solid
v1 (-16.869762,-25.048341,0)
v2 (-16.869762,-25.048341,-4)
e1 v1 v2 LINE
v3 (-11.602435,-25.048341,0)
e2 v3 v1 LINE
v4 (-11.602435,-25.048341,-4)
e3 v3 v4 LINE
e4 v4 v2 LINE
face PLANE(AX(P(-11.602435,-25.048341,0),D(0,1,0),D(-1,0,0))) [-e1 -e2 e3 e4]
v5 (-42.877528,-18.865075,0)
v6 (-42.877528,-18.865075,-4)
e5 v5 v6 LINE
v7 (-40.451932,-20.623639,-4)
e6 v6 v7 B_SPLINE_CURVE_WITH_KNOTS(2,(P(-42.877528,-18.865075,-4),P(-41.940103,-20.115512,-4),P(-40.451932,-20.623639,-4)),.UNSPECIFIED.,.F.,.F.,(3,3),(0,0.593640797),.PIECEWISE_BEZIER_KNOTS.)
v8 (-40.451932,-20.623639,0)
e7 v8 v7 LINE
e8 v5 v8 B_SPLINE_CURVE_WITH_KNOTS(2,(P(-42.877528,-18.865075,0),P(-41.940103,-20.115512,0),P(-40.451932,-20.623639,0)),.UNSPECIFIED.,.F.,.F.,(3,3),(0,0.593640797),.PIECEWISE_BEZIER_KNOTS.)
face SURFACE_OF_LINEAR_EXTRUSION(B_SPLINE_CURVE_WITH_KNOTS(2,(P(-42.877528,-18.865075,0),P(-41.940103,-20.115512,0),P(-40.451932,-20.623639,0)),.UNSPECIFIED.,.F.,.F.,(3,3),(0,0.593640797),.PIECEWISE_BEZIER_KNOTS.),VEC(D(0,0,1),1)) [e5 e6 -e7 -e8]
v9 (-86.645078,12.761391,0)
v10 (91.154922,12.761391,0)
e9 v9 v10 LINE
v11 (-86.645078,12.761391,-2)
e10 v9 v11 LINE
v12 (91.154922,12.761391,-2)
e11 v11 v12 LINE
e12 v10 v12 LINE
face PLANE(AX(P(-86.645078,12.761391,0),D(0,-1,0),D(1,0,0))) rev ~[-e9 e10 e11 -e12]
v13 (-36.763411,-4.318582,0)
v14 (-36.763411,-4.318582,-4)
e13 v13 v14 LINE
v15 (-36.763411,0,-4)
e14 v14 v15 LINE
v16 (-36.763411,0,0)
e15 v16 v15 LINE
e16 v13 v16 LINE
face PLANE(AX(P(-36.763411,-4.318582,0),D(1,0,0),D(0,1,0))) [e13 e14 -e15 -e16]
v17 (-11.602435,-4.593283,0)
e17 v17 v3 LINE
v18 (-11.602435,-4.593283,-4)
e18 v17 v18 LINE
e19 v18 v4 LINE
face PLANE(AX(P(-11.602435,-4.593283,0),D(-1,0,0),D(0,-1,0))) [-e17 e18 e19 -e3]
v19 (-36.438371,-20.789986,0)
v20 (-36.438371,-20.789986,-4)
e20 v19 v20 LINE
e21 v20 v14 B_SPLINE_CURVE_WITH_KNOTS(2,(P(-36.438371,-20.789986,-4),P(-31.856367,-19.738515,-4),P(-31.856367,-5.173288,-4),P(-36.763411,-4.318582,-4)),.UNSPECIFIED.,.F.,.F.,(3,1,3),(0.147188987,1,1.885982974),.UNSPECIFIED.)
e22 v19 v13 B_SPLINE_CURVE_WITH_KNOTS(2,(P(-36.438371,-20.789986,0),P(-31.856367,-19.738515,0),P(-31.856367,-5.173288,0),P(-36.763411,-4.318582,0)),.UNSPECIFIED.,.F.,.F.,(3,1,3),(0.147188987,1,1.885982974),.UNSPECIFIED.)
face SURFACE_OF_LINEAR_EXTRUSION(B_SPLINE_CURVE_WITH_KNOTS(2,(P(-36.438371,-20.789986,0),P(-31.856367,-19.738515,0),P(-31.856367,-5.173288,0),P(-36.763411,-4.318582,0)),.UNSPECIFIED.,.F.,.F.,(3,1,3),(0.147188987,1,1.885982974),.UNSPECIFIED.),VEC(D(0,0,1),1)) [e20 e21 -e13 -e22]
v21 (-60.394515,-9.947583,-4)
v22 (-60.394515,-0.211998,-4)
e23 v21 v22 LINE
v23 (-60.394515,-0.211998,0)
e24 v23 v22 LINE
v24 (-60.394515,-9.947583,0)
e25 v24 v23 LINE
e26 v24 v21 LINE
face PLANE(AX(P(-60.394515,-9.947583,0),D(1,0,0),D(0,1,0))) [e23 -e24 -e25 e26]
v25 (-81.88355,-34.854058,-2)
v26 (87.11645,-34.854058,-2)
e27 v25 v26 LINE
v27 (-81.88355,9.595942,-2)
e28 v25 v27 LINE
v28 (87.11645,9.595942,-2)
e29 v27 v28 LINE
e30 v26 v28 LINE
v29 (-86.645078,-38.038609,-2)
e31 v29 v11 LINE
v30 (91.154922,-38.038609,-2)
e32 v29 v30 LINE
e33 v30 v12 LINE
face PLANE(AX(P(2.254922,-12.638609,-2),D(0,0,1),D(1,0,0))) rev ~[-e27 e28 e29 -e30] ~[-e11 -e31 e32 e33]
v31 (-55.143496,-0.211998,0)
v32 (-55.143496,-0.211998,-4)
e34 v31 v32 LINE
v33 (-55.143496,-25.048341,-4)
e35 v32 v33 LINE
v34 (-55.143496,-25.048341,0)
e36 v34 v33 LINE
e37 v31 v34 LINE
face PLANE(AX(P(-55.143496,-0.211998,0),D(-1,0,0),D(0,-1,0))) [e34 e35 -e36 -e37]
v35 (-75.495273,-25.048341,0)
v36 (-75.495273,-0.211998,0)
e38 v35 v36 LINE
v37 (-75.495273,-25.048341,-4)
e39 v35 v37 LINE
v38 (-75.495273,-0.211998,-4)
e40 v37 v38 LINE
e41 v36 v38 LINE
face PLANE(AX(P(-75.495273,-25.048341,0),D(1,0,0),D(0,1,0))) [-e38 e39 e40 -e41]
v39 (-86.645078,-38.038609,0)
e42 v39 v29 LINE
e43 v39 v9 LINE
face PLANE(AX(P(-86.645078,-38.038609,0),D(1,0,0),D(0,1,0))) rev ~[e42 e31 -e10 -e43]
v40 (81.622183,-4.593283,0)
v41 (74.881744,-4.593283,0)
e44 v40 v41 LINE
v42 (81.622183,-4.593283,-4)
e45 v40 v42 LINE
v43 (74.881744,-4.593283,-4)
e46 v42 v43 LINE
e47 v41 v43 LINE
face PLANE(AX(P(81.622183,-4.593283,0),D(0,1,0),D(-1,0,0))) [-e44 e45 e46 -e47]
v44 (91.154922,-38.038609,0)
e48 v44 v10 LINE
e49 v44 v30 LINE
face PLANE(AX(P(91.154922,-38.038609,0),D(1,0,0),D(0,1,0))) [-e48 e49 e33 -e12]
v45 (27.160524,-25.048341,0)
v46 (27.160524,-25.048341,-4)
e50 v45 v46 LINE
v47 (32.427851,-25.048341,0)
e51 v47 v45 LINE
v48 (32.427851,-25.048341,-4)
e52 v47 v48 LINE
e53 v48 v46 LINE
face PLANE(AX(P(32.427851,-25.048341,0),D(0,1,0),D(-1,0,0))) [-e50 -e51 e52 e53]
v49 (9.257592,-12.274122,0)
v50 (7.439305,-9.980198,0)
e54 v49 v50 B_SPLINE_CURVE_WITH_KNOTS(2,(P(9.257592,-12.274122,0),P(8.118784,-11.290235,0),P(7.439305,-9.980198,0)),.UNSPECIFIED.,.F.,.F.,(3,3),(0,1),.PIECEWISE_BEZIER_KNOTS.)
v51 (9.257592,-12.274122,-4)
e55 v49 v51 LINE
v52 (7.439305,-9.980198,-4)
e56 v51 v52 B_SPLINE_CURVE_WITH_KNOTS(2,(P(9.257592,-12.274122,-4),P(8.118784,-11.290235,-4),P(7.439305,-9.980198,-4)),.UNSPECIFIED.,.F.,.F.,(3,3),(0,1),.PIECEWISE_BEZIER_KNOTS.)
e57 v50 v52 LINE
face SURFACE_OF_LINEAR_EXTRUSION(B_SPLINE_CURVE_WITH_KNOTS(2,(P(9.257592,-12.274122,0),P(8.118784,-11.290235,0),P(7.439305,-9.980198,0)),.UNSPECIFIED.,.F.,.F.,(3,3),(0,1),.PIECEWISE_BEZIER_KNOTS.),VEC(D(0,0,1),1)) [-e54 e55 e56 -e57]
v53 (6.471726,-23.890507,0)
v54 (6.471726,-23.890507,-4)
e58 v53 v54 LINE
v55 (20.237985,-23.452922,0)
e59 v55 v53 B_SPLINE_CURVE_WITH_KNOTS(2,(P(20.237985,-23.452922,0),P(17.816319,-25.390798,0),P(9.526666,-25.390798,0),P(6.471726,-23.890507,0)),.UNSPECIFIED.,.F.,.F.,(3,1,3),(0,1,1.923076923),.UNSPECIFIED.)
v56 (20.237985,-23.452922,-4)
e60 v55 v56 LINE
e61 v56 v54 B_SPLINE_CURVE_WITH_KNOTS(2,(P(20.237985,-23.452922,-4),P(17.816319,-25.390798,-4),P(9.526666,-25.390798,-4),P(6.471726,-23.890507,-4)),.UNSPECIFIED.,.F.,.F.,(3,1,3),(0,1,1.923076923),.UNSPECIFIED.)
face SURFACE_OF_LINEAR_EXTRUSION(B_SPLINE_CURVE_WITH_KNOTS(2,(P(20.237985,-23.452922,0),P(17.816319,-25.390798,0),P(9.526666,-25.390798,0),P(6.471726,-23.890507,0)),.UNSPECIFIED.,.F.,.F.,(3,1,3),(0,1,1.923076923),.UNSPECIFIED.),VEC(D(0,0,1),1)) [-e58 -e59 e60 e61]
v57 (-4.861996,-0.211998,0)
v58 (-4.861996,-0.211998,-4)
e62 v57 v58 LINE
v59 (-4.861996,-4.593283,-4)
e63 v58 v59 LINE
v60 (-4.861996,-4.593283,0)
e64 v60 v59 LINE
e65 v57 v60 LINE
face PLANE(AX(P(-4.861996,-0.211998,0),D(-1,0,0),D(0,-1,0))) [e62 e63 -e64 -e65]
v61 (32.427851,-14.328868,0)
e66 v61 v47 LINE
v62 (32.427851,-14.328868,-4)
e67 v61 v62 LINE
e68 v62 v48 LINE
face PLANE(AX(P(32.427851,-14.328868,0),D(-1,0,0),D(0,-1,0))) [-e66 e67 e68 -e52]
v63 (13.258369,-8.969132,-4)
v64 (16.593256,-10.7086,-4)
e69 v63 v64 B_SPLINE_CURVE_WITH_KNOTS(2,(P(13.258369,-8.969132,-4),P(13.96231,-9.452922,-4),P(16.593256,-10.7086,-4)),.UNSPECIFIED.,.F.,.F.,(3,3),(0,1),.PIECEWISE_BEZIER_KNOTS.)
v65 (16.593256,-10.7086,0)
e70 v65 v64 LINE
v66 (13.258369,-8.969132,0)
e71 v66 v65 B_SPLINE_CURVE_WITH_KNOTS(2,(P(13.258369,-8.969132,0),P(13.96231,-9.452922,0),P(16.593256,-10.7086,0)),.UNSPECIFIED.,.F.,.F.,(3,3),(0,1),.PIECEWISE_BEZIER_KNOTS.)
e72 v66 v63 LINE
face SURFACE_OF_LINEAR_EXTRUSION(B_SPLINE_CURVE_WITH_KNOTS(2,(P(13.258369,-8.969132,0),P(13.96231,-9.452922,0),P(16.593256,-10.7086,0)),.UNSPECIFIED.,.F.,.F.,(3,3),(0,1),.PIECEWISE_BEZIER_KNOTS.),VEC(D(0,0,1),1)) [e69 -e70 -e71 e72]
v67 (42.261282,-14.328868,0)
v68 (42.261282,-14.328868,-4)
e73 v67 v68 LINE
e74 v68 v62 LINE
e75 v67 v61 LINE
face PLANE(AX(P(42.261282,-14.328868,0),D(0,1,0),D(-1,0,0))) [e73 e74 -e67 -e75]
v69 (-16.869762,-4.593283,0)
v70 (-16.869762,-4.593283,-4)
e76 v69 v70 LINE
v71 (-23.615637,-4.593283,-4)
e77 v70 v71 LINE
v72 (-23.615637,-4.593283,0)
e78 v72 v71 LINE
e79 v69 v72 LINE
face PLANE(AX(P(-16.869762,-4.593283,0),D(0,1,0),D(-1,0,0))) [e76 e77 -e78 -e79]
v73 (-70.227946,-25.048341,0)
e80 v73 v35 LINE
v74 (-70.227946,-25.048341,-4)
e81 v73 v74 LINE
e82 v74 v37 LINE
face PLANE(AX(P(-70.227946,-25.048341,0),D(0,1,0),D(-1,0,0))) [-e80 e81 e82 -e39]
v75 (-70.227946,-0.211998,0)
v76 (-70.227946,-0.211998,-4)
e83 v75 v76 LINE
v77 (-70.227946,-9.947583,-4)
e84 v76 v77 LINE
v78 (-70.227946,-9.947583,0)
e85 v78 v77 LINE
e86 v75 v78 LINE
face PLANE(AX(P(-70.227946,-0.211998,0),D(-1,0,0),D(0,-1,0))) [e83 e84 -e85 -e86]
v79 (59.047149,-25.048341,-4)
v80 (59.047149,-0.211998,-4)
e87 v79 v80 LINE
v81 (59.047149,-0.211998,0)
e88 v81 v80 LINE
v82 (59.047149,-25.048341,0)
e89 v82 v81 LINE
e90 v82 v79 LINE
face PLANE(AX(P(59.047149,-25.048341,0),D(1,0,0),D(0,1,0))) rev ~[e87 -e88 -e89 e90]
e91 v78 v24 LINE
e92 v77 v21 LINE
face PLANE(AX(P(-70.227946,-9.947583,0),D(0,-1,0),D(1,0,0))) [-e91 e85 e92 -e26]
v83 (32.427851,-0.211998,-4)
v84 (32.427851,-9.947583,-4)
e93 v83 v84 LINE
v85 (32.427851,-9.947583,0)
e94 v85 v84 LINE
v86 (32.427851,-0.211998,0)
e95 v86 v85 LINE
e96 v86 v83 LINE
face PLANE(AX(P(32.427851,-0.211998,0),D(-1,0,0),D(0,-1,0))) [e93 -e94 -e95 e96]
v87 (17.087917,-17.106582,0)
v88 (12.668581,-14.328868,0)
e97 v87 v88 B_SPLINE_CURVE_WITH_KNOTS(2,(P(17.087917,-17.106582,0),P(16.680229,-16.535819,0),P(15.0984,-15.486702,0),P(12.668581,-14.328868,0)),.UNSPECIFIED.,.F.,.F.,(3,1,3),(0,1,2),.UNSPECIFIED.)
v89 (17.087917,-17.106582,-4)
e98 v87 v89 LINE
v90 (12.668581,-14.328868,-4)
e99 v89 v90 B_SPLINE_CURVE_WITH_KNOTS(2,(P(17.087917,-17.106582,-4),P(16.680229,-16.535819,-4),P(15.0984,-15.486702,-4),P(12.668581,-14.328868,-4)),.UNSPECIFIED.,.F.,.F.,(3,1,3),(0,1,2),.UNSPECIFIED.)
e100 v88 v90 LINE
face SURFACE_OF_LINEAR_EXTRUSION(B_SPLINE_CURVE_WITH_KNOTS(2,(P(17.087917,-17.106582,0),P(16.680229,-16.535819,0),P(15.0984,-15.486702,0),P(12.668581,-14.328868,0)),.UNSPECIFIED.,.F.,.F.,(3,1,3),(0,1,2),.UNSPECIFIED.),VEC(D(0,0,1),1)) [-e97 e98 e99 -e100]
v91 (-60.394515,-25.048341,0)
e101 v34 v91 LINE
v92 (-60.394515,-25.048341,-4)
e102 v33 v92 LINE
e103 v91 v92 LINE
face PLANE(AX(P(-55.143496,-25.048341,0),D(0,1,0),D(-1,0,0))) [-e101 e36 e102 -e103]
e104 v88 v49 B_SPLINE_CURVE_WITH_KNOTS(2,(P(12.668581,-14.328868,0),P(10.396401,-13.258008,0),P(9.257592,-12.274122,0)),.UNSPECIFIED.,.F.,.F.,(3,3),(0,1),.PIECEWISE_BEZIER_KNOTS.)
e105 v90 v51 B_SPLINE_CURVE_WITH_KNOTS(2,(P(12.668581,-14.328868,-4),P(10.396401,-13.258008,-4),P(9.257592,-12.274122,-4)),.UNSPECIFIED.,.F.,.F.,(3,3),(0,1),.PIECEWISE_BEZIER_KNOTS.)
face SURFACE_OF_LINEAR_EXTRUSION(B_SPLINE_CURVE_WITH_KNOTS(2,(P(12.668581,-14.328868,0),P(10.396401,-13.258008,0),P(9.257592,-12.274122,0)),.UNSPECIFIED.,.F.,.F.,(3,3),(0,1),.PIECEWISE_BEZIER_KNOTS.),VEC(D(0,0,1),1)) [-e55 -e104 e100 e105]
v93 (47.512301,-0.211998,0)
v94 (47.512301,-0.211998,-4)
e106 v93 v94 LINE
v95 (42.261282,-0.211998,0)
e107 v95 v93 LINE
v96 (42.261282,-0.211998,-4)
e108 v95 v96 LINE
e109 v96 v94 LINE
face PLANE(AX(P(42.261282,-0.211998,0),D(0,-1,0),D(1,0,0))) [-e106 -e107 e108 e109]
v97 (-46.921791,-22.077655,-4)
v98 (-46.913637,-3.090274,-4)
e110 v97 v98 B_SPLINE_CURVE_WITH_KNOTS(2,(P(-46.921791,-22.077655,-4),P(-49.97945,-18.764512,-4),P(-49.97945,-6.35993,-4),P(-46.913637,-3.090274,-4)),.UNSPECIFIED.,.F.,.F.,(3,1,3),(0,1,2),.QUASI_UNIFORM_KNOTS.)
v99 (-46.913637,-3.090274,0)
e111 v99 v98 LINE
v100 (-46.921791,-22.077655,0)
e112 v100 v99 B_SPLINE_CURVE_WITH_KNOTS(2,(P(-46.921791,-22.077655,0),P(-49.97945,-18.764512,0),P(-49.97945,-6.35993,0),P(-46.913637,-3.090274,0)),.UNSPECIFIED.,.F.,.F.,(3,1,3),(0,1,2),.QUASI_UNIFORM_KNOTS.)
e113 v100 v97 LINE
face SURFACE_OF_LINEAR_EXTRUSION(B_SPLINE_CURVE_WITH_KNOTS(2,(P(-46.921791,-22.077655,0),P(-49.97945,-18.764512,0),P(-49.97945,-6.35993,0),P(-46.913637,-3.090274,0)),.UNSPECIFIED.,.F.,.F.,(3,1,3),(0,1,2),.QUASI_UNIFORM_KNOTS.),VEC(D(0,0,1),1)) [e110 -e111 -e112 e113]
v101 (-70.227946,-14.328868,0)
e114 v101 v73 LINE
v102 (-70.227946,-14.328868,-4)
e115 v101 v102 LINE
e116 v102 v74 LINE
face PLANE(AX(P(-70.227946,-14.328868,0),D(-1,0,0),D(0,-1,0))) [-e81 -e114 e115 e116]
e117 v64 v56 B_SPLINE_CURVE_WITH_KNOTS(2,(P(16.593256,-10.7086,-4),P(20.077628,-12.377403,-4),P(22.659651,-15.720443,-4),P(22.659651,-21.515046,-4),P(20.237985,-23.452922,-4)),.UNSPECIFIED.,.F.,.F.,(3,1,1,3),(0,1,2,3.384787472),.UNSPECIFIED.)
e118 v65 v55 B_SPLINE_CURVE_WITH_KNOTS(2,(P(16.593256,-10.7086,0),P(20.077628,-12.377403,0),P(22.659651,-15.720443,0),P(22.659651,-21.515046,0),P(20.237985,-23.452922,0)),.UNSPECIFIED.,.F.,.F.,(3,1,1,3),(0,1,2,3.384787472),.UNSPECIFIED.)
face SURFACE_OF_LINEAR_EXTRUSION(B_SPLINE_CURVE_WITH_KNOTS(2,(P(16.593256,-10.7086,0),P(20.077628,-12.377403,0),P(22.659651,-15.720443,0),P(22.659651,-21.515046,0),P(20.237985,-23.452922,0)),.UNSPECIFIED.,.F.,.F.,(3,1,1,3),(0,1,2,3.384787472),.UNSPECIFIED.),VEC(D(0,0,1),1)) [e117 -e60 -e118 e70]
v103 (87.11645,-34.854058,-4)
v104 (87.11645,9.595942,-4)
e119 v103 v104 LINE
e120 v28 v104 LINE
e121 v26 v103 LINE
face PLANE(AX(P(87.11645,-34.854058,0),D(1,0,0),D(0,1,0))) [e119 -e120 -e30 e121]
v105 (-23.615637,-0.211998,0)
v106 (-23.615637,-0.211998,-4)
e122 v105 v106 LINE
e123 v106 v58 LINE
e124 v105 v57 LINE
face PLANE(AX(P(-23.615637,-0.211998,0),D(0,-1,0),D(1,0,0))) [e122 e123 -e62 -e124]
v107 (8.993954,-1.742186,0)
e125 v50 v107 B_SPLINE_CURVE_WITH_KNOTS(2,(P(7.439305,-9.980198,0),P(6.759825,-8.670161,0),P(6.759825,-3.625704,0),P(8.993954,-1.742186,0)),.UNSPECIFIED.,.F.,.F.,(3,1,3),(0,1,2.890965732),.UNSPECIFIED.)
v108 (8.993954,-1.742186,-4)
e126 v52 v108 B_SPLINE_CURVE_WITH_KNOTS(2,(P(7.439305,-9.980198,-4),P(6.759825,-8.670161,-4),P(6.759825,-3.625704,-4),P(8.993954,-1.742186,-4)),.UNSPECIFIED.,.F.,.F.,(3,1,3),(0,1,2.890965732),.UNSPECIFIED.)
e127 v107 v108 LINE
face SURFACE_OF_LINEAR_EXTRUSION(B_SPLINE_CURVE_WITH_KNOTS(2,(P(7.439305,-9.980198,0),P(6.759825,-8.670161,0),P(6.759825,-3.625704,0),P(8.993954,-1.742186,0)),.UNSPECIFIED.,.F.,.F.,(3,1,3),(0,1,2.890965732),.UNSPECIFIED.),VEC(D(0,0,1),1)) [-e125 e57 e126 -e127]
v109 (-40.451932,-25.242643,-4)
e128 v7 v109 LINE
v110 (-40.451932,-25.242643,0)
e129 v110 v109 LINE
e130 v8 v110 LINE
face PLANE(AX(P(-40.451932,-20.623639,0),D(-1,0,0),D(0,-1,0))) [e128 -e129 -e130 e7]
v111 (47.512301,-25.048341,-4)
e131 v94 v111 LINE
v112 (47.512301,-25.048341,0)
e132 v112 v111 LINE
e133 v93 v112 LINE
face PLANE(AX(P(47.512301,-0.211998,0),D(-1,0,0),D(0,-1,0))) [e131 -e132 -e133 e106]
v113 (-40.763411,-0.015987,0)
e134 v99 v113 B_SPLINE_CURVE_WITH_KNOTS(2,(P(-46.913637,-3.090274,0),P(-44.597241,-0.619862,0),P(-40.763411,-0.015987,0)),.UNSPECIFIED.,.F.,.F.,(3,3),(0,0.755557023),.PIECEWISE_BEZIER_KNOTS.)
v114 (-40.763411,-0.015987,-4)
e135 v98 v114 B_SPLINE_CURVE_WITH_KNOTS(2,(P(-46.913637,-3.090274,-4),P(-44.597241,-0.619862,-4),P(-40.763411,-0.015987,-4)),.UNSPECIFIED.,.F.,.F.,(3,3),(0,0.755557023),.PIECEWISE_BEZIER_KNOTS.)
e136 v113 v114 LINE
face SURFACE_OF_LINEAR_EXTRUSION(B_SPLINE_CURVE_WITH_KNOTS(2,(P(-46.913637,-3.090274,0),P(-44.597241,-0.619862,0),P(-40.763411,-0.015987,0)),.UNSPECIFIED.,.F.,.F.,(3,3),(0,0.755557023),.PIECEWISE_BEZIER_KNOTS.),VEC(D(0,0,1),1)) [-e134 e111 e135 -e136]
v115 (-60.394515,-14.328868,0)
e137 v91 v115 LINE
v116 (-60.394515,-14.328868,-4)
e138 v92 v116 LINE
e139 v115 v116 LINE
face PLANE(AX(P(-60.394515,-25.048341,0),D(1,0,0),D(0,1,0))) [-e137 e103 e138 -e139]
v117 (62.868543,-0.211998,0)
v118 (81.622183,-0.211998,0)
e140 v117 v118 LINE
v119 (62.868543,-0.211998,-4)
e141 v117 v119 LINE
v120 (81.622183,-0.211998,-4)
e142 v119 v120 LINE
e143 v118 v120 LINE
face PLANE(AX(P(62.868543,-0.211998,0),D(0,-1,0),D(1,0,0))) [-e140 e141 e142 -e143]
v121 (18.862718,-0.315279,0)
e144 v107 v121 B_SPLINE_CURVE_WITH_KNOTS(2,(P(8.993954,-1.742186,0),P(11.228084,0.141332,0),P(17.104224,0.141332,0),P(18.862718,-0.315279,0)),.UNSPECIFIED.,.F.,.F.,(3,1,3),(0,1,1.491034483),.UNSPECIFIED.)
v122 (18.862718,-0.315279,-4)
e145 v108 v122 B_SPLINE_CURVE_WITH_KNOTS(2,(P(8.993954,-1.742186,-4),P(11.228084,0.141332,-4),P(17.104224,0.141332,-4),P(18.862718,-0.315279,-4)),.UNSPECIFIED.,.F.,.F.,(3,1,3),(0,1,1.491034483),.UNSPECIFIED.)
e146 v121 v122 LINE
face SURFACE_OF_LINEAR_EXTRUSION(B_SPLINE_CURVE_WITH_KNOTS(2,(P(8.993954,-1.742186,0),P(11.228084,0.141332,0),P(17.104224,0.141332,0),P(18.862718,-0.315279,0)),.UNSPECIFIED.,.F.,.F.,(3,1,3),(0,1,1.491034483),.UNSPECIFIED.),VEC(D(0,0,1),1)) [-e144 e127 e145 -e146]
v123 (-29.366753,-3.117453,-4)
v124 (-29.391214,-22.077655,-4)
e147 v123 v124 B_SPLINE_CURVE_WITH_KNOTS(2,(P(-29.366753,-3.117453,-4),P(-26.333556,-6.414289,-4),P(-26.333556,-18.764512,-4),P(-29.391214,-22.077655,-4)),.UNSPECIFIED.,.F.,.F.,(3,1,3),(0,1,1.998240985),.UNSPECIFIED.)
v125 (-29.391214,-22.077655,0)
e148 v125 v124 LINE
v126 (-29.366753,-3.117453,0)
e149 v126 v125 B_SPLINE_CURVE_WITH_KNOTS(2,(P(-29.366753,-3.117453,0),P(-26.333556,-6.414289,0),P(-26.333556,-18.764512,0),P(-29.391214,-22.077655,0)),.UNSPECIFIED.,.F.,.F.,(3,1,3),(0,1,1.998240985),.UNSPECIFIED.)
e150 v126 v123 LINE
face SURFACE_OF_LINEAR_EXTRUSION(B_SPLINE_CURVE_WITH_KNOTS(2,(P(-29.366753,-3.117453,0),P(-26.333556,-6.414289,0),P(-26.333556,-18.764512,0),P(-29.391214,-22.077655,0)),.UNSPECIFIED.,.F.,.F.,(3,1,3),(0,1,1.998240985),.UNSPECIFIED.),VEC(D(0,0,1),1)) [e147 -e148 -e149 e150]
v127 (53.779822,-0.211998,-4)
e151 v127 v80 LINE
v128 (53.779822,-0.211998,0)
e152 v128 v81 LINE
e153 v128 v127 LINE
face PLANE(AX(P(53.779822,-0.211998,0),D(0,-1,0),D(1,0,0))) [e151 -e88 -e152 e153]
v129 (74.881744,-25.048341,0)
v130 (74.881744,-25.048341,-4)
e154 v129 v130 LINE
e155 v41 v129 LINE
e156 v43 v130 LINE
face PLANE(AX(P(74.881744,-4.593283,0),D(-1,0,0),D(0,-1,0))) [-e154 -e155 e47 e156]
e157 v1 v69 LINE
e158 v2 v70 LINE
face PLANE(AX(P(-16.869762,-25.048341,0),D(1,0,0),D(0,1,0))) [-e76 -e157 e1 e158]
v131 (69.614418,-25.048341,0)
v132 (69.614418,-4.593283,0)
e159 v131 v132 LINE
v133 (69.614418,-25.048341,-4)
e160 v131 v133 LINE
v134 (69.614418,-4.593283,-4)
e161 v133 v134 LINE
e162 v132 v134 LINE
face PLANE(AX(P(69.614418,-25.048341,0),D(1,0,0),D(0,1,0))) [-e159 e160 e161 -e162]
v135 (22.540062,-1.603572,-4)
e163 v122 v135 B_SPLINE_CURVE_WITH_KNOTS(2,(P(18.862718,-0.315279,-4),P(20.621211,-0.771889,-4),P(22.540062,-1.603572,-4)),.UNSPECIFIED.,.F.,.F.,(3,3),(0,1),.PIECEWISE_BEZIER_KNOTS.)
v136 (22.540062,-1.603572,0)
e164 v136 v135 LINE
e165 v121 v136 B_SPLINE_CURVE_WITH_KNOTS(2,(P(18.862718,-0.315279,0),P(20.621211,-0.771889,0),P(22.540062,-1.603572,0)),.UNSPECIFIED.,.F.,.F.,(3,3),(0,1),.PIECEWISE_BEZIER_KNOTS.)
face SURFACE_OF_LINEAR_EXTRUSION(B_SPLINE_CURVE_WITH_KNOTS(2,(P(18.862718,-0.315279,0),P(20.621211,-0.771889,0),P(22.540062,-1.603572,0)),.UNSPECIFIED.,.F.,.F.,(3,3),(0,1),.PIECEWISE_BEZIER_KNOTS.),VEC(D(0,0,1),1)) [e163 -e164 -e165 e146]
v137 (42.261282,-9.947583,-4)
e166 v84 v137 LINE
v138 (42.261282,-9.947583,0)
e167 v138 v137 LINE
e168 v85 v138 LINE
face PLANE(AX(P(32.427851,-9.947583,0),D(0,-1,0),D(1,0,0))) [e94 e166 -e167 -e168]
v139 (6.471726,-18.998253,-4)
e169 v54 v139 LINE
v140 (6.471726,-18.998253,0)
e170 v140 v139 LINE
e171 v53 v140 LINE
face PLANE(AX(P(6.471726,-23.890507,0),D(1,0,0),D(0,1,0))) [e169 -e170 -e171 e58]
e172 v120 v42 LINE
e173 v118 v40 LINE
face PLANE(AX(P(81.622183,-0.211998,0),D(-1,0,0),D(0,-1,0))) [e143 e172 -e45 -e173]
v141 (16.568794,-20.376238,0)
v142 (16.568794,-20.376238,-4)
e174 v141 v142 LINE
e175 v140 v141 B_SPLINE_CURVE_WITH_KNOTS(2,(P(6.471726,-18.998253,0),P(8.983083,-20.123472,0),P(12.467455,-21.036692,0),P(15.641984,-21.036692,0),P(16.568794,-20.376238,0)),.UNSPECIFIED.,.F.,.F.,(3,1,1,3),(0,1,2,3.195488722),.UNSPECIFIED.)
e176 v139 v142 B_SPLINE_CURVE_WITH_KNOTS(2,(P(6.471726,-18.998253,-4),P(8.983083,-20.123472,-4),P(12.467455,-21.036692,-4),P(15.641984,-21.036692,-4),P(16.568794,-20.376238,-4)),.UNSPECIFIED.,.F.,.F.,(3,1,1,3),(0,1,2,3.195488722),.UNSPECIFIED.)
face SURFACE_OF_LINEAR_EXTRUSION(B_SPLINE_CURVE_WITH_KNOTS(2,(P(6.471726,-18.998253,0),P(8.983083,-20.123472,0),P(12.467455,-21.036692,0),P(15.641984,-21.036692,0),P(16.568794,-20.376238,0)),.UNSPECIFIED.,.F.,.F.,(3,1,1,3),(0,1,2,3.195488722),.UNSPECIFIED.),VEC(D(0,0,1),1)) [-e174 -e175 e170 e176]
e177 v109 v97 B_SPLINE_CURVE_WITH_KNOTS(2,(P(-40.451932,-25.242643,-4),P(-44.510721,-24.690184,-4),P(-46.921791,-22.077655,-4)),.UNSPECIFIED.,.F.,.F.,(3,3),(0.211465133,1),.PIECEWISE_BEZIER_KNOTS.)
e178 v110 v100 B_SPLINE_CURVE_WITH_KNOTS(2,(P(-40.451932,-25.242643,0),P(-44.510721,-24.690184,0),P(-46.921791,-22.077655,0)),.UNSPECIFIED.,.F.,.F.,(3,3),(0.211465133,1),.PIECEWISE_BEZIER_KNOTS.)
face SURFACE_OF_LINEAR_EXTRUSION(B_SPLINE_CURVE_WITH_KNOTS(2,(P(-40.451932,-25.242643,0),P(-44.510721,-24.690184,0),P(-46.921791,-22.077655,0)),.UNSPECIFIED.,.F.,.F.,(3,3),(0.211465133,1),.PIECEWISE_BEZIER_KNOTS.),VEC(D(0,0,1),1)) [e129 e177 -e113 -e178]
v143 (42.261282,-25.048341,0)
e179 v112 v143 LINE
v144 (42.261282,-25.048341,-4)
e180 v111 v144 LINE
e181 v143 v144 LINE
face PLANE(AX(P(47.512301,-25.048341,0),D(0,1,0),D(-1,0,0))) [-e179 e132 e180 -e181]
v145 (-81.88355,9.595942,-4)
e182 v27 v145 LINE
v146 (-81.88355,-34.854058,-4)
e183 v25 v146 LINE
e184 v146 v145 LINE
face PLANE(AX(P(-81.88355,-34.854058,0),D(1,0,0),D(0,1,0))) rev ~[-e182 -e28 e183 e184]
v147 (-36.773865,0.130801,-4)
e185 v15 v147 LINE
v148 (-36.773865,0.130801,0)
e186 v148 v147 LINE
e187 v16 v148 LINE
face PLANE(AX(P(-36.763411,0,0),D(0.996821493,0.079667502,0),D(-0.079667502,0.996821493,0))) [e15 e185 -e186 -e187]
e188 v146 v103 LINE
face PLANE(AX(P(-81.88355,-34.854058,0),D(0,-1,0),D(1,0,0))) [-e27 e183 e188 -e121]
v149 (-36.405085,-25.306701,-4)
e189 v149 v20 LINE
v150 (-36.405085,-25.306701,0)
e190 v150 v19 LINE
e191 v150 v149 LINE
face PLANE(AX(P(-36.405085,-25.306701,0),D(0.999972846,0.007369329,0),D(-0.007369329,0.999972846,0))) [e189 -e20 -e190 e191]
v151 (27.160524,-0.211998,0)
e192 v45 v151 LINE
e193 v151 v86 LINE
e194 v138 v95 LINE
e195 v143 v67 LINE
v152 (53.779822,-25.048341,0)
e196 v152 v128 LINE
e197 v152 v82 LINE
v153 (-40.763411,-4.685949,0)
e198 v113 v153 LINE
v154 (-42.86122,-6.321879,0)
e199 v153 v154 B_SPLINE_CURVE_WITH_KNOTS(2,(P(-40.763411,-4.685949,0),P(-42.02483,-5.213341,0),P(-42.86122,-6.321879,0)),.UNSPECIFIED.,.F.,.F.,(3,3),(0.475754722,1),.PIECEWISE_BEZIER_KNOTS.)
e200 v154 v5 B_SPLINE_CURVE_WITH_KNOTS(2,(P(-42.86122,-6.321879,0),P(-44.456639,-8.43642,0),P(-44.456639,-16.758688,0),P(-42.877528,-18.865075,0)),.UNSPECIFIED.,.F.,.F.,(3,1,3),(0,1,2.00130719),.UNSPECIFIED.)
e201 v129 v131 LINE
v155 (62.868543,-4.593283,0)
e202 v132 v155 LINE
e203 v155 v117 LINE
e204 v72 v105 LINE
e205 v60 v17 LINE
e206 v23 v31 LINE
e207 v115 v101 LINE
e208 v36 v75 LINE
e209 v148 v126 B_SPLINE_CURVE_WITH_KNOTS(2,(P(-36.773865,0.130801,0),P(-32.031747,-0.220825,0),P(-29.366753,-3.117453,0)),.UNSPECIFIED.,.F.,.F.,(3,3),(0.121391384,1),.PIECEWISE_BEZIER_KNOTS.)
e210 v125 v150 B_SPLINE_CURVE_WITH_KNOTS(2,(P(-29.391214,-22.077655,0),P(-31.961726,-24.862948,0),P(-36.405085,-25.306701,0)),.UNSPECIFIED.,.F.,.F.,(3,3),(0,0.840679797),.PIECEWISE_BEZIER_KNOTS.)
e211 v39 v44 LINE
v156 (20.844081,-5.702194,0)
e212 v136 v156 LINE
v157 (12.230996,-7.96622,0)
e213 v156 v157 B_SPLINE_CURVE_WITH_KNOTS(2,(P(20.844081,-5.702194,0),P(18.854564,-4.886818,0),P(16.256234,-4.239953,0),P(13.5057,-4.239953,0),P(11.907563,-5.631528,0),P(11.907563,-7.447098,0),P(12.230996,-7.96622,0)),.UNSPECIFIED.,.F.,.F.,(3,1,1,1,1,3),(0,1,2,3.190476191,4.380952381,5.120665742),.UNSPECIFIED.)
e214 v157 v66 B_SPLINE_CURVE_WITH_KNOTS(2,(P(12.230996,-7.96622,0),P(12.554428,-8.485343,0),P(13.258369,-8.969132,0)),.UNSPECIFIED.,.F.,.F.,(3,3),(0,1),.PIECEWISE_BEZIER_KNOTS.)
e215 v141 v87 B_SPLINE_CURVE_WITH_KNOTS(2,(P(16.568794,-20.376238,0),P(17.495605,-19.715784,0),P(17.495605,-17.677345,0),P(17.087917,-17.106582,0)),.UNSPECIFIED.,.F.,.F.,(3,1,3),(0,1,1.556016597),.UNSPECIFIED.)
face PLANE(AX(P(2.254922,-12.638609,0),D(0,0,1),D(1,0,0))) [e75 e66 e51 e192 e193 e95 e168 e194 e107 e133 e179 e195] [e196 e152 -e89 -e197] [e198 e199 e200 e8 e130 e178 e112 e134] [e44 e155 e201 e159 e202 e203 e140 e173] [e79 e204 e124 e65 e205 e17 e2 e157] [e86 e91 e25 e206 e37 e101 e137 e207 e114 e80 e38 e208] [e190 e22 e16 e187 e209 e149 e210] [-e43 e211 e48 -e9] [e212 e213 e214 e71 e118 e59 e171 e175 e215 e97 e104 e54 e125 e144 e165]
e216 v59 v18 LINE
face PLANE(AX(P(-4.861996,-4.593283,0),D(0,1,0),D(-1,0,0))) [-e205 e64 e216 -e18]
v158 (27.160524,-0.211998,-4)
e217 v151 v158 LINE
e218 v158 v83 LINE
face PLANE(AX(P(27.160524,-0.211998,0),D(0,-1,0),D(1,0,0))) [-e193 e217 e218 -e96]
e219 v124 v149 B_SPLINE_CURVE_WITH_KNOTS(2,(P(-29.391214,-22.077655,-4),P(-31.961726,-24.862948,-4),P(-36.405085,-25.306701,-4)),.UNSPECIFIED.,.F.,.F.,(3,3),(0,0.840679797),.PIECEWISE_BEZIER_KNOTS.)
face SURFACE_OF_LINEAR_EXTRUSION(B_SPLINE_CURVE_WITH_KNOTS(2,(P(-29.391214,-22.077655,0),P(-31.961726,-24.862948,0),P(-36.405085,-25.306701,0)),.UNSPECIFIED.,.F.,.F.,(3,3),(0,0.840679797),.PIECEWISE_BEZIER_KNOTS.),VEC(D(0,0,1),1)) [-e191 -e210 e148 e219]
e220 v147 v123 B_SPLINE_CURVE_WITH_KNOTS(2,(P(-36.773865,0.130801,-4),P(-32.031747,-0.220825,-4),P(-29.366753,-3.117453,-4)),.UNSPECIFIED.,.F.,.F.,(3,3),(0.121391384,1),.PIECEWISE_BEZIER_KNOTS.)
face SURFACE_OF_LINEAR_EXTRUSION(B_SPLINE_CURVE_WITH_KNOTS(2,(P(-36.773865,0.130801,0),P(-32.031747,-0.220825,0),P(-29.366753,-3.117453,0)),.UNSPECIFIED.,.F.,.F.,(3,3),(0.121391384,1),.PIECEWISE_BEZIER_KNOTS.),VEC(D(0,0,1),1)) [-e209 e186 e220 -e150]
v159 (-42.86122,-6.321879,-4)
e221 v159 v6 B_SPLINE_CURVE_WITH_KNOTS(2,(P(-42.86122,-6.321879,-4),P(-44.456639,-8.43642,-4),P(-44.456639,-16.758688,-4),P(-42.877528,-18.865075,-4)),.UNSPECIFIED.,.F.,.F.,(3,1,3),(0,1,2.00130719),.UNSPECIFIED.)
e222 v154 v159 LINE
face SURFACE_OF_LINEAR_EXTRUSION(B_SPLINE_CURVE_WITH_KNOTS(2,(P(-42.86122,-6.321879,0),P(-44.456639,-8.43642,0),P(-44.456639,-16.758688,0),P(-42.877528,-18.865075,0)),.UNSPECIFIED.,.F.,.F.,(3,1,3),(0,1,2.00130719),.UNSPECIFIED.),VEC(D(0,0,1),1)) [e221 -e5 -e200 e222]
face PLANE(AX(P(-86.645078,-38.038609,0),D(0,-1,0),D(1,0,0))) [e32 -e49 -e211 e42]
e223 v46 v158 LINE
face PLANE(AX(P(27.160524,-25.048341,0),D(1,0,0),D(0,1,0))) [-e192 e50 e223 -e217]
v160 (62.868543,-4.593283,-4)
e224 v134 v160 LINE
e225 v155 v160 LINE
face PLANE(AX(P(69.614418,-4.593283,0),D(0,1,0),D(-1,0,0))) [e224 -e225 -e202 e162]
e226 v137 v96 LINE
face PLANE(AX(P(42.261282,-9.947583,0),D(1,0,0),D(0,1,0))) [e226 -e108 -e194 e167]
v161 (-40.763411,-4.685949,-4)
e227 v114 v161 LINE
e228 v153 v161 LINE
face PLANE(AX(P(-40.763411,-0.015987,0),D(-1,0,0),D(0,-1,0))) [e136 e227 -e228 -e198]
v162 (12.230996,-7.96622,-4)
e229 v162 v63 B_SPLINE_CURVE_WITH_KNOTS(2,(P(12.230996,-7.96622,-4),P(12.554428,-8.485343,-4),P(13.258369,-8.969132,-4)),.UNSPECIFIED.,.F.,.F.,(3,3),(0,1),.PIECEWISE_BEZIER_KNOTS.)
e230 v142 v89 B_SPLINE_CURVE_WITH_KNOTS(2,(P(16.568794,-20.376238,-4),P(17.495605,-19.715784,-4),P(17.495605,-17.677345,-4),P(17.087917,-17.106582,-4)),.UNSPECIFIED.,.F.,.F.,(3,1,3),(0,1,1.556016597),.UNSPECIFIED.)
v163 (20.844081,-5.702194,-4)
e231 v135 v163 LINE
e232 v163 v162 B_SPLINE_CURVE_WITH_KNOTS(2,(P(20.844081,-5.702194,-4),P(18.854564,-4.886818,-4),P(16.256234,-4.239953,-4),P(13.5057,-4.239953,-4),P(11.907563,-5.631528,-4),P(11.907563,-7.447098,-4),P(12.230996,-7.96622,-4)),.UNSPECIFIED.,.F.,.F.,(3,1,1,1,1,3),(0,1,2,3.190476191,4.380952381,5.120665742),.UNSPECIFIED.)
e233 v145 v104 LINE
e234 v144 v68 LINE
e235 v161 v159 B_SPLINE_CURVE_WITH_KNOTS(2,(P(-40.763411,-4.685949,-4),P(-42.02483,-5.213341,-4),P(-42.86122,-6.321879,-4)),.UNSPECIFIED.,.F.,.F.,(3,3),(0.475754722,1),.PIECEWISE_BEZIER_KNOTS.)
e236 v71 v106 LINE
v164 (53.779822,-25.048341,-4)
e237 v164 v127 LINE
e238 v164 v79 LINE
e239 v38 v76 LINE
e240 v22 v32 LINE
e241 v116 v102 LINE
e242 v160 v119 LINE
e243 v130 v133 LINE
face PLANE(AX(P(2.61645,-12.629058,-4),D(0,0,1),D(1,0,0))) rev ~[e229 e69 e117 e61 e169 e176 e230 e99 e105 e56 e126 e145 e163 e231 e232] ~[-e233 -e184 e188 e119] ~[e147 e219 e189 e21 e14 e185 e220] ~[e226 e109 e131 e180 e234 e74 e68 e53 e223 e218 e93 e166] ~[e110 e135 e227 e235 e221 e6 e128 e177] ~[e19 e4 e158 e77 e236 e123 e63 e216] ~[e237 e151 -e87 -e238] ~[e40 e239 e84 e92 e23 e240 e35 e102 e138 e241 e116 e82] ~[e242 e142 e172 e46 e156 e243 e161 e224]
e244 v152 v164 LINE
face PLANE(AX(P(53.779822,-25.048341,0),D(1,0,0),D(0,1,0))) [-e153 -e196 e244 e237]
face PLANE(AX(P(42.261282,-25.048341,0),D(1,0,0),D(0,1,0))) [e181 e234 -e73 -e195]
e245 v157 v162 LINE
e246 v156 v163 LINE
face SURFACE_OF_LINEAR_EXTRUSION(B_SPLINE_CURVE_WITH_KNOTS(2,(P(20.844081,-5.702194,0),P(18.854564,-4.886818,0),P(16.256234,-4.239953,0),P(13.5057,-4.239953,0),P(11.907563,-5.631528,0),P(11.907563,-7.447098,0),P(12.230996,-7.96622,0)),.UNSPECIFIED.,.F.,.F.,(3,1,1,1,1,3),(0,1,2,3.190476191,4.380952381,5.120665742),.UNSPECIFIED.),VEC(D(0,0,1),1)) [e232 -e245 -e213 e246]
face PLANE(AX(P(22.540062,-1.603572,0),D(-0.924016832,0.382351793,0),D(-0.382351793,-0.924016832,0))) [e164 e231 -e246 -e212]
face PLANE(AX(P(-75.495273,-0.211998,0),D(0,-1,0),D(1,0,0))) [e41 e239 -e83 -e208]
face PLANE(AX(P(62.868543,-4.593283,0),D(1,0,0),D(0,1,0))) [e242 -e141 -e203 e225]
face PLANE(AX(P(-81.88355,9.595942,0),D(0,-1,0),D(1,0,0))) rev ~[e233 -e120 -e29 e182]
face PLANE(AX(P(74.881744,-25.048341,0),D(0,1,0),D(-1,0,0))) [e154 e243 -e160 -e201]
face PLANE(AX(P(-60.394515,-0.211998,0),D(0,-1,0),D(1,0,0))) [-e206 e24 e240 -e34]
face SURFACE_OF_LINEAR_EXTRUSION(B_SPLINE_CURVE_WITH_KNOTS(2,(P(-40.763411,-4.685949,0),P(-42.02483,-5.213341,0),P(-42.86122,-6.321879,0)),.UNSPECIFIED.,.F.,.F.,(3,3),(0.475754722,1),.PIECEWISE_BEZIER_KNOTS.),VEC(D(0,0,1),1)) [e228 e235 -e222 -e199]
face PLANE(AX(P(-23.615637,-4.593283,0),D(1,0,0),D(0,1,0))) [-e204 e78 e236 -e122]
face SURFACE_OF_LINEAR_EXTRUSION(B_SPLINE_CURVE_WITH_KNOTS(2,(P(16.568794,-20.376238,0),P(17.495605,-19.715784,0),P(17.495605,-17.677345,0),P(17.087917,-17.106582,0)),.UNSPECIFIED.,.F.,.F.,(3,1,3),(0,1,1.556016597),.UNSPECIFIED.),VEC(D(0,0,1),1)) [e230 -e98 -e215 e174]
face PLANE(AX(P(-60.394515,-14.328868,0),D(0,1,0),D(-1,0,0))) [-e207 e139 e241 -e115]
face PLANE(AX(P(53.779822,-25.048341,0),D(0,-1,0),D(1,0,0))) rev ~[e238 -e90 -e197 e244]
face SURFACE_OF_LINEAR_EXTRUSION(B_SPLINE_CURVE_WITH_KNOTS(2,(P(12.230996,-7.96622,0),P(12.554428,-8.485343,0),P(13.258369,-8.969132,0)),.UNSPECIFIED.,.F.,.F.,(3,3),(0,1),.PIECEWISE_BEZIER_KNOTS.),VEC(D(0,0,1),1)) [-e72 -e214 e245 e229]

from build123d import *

# Parameters (mm, degrees)
F0_W     = 169
F0_H     = 44.45
F0_W_2   = 5.2673268342
F0_H_2   = 24.8363429365
F1_DEPTH = 4
F0_W_3   = 177.8
F0_H_3   = 50.8
F2_DEPTH = 2


with BuildPart() as f1:
    # F0 (on Top) → F1 (new body)
    with BuildSketch(Plane.XY):
        with Locations((2.6164503098, -12.6290581763)):
            Rectangle(F0_W, F0_H)
        Polygon((-55.1434959277, -0.2119976744), (-55.1434959277, -25.0483406109), (-60.3945152484, -25.0483406109), (-60.3945152484, -14.3288684571), (-70.2279458398, -14.3288684571), (-70.2279458398, -25.0483406109), (-75.495272674, -25.0483406109), (-75.495272674, -0.2119976744), (-70.2279458398, -0.2119976744), (-70.2279458398, -9.9475831853), (-60.3945152484, -9.9475831853), (-60.3945152484, -0.2119976744), align=None, mode=Mode.SUBTRACT)
        with BuildLine():
            Line((-40.7634110153, -0.0159870709), (-40.7634110153, 0))
            Line((-40.7634110153, 0), (-40.7634110153, 1.3887999812))
            Line((-40.7634110153, 1.3887999812), (-36.8744060397, 1.3887999812))
            Line((-36.8744060397, 1.3887999812), (-36.7738648248, 0.1308009128))
            add(Edge.make_bspline(
                [(-36.7738648248, 0.1308009128), (-32.0317465053, -0.2208247915), (-29.3667530507, -3.1174529818)],
                knots=[0.1213913838, 0.1213913838, 0.1213913838, 1, 1, 1], degree=2))
            add(Edge.make_bspline(
                [(-29.3667530507, -3.1174529818), (-26.3335555549, -6.4142886113), (-26.3335555549, -12.5948361969)],
                knots=[0, 0, 0, 1, 1, 1], degree=2))
            add(Edge.make_bspline(
                [(-26.3335555549, -12.5948361969), (-26.3335555549, -18.764512107), (-29.3912143208, -22.0776552498)],
                knots=[0, 0, 0, 1, 1, 1], degree=2))
            add(Edge.make_bspline(
                [(-29.3912143208, -22.0776552498), (-31.96172627, -24.8629477529), (-36.405085353, -25.3067011213)],
                knots=[0, 0, 0, 0.8406797965, 0.8406797965, 0.8406797965], degree=2))
            Line((-36.405085353, -25.3067011213), (-36.4003777504, -25.9454939514))
            Line((-36.4003777504, -25.9454939514), (-40.4519320428, -25.9454939514))
            Line((-40.4519320428, -25.9454939514), (-40.4519320428, -25.2426429066))
            add(Edge.make_bspline(
                [(-40.4519320428, -25.2426429066), (-44.5107206961, -24.6901841388), (-46.9217912458, -22.0776552498)],
                knots=[0.2114651326, 0.2114651326, 0.2114651326, 1, 1, 1], degree=2))
            add(Edge.make_bspline(
                [(-46.9217912458, -22.0776552498), (-49.9794500118, -18.764512107), (-49.9794500118, -12.5622211701)],
                knots=[0, 0, 0, 1, 1, 1], degree=2))
            add(Edge.make_bspline(
                [(-49.9794500118, -12.5622211701), (-49.9794500118, -6.3599302332), (-46.9136374891, -3.0902737928)],
                knots=[0, 0, 0, 1, 1, 1], degree=2))
            add(Edge.make_bspline(
                [(-46.9136374891, -3.0902737928), (-44.5972413071, -0.6198619073), (-40.7634110153, -0.0159870709)],
                knots=[0, 0, 0, 0.7555570228, 0.7555570228, 0.7555570228], degree=2))
        make_face(mode=Mode.SUBTRACT)
        Polygon((-11.6024351001, -4.5932829462), (-11.6024351001, -25.0483406109), (-16.8697619343, -25.0483406109), (-16.8697619343, -4.5932829462), (-23.6156366518, -4.5932829462), (-23.6156366518, -0.2119976744), (-4.8619962204, -0.2119976744), (-4.8619962204, -4.5932829462), align=None, mode=Mode.SUBTRACT)
        with BuildLine():
            add(Edge.make_bspline(
                [(21.3686391133, -14.0489228101), (22.6596505923, -15.7204429355), (22.6596505923, -18.1502624349)],
                knots=[0, 0, 0, 1, 1, 1], degree=2))
            add(Edge.make_bspline(
                [(22.6596505923, -18.1502624349), (22.6596505923, -21.5150460369), (20.2379848496, -23.4529222148)],
                knots=[0, 0, 0, 1, 1, 1], degree=2))
            add(Edge.make_bspline(
                [(20.2379848496, -23.4529222148), (17.816319107, -25.3907983927), (13.5056997267, -25.3907983927)],
                knots=[0, 0, 0, 1, 1, 1], degree=2))
            add(Edge.make_bspline(
                [(13.5056997267, -25.3907983927), (9.5266664525, -25.3907983927), (6.4717256055, -23.8905071582)],
                knots=[0, 0, 0, 1, 1, 1], degree=2))
            Line((6.4717256055, -23.8905071582), (6.4717256055, -18.9982531326))
            add(Edge.make_bspline(
                [(6.4717256055, -18.9982531326), (8.9830826719, -20.1234715585), (10.7252686888, -20.5800819342)],
                knots=[0, 0, 0, 1, 1, 1], degree=2))
            add(Edge.make_bspline(
                [(10.7252686888, -20.5800819342), (12.4674547057, -21.0366923099), (13.9133875621, -21.0366923099)],
                knots=[0, 0, 0, 1, 1, 1], degree=2))
            add(Edge.make_bspline(
                [(13.9133875621, -21.0366923099), (15.6419839845, -21.0366923099), (16.5687943305, -20.3762380165)],
                knots=[0, 0, 0, 1, 1, 1], degree=2))
            add(Edge.make_bspline(
                [(16.5687943305, -20.3762380165), (17.4956046764, -19.715783723), (17.4956046764, -18.4057468117)],
                knots=[0, 0, 0, 1, 1, 1], degree=2))
            add(Edge.make_bspline(
                [(17.4956046764, -18.4057468117), (17.4956046764, -17.6773445457), (17.0879168409, -17.1065815761)],
                knots=[0, 0, 0, 1, 1, 1], degree=2))
            add(Edge.make_bspline(
                [(17.0879168409, -17.1065815761), (16.6802290055, -16.5358186064), (15.8893146047, -16.0112602581)],
                knots=[0, 0, 0, 1, 1, 1], degree=2))
            add(Edge.make_bspline(
                [(15.8893146047, -16.0112602581), (15.0984002039, -15.4867019098), (12.6685807045, -14.3288684571)],
                knots=[0, 0, 0, 1, 1, 1], degree=2))
            add(Edge.make_bspline(
                [(12.6685807045, -14.3288684571), (10.3964005015, -13.2580084093), (9.2575924811, -12.2741217664)],
                knots=[0, 0, 0, 1, 1, 1], degree=2))
            add(Edge.make_bspline(
                [(9.2575924811, -12.2741217664), (8.1187844607, -11.2902351234), (7.439304735, -9.9801982122)],
                knots=[0, 0, 0, 1, 1, 1], degree=2))
            add(Edge.make_bspline(
                [(7.439304735, -9.9801982122), (6.7598250092, -8.6701613009), (6.7598250092, -6.9252573651)],
                knots=[0, 0, 0, 1, 1, 1], degree=2))
            add(Edge.make_bspline(
                [(6.7598250092, -6.9252573651), (6.7598250092, -3.6257038167), (8.9939543475, -1.7421860169)],
                knots=[0, 0, 0, 1, 1, 1], degree=2))
            add(Edge.make_bspline(
                [(8.9939543475, -1.7421860169), (11.2280836859, 0.141331783), (15.1690660954, 0.141331783)],
                knots=[0, 0, 0, 1, 1, 1], degree=2))
            add(Edge.make_bspline(
                [(15.1690660954, 0.141331783), (17.1042243544, 0.141331783), (18.8627178847, -0.3152785928)],
                knots=[0, 0, 0, 1, 1, 1], degree=2))
            add(Edge.make_bspline(
                [(18.8627178847, -0.3152785928), (20.621211415, -0.7718889685), (22.5400621606, -1.6035721528)],
                knots=[0, 0, 0, 1, 1, 1], degree=2))
            Line((22.5400621606, -1.6035721528), (20.844080765, -5.7021938587))
            add(Edge.make_bspline(
                [(20.844080765, -5.7021938587), (18.854564128, -4.8868181878), (17.5553988923, -4.5633858383)],
                knots=[0, 0, 0, 1, 1, 1], degree=2))
            add(Edge.make_bspline(
                [(17.5553988923, -4.5633858383), (16.2562336566, -4.2399534888), (15.0005551234, -4.2399534888)],
                knots=[0, 0, 0, 1, 1, 1], degree=2))
            add(Edge.make_bspline(
                [(15.0005551234, -4.2399534888), (13.5056997267, -4.2399534888), (12.7066315692, -4.935740728)],
                knots=[0, 0, 0, 1, 1, 1], degree=2))
            add(Edge.make_bspline(
                [(12.7066315692, -4.935740728), (11.9075634117, -5.6315279672), (11.9075634117, -6.7513105553)],
                knots=[0, 0, 0, 1, 1, 1], degree=2))
            add(Edge.make_bspline(
                [(11.9075634117, -6.7513105553), (11.9075634117, -7.4470977945), (12.2309957611, -7.966220305)],
                knots=[0, 0, 0, 1, 1, 1], degree=2))
            add(Edge.make_bspline(
                [(12.2309957611, -7.966220305), (12.5544281106, -8.4853428155), (13.2583691065, -8.9691323802)],
                knots=[0, 0, 0, 1, 1, 1], degree=2))
            add(Edge.make_bspline(
                [(13.2583691065, -8.9691323802), (13.9623101024, -9.452921945), (16.5932556006, -10.7086004782)],
                knots=[0, 0, 0, 1, 1, 1], degree=2))
            add(Edge.make_bspline(
                [(16.5932556006, -10.7086004782), (20.0776276343, -12.3774026847), (21.3686391133, -14.0489228101)],
                knots=[0, 0, 0, 1, 1, 1], degree=2))
        make_face(mode=Mode.SUBTRACT)
        Polygon((47.5123010422, -0.2119976744), (47.5123010422, -25.0483406109), (42.2612817214, -25.0483406109), (42.2612817214, -14.3288684571), (32.42785113, -14.3288684571), (32.42785113, -25.0483406109), (27.1605242958, -25.0483406109), (27.1605242958, -0.2119976744), (32.42785113, -0.2119976744), (32.42785113, -9.9475831853), (42.2612817214, -9.9475831853), (42.2612817214, -0.2119976744), align=None, mode=Mode.SUBTRACT)
        with Locations((56.4134854498, -12.6301691427)):
            Rectangle(F0_W_2, F0_H_2, mode=Mode.SUBTRACT)
        Polygon((74.8817443963, -4.5932829462), (74.8817443963, -25.0483406109), (69.6144175621, -25.0483406109), (69.6144175621, -4.5932829462), (62.8685428446, -4.5932829462), (62.8685428446, -0.2119976744), (81.622183276, -0.2119976744), (81.622183276, -4.5932829462), align=None, mode=Mode.SUBTRACT)
        with BuildLine():
            Line((-40.7634110153, 1.3887999812), (-40.7634110153, 0))
            Line((-40.7634110153, 0), (-40.7634110153, -0.0159870709))
            add(Edge.make_bspline(
                [(-40.7634110153, -0.0159870709), (-39.5230640096, 0.1793826476), (-38.1238877565, 0.1793826476)],
                knots=[0.7555570228, 0.7555570228, 0.7555570228, 1, 1, 1], degree=2))
            add(Edge.make_bspline(
                [(-38.1238877565, 0.1793826476), (-37.429051098, 0.1793826476), (-36.7738648248, 0.1308009128)],
                knots=[0, 0, 0, 0.1213913838, 0.1213913838, 0.1213913838], degree=2))
            Line((-36.7738648248, 0.1308009128), (-36.8744060397, 1.3887999812))
            Line((-36.8744060397, 1.3887999812), (-40.7634110153, 1.3887999812))
        make_face()
        with BuildLine():
            add(Edge.make_bspline(
                [(-40.7634110153, -0.0159870709), (-39.5230640096, 0.1793826476), (-38.1238877565, 0.1793826476)],
                knots=[0.7555570228, 0.7555570228, 0.7555570228, 1, 1, 1], degree=2))
            Line((-40.7634110153, -0.0159870709), (-40.7634110153, -4.6859490545))
            add(Edge.make_bspline(
                [(-38.1238877565, -4.207338462), (-39.6186682979, -4.207338462), (-40.7634110153, -4.6859490545)],
                knots=[0, 0, 0, 0.475754722, 0.475754722, 0.475754722], degree=2))
            add(Edge.make_bspline(
                [(-36.7634110153, -4.3185824581), (-37.4020860912, -4.207338462), (-38.1238877565, -4.207338462)],
                knots=[0.8848345835, 0.8848345835, 0.8848345835, 1, 1, 1], degree=2))
            Line((-36.7634110153, -4.3185824581), (-36.7634110153, 0))
            Line((-36.7634110153, 0), (-36.7738648248, 0.1308009128))
            add(Edge.make_bspline(
                [(-38.1238877565, 0.1793826476), (-37.429051098, 0.1793826476), (-36.7738648248, 0.1308009128)],
                knots=[0, 0, 0, 0.1213913838, 0.1213913838, 0.1213913838], degree=2))
        make_face()
        with BuildLine():
            add(Edge.make_bspline(
                [(-38.1238877565, -4.207338462), (-39.6186682979, -4.207338462), (-40.7634110153, -4.6859490545)],
                knots=[0, 0, 0, 0.475754722, 0.475754722, 0.475754722], degree=2))
            Line((-40.7634110153, -4.6859490545), (-40.7634110153, -4.7359894961))
            Line((-40.7634110153, -4.7359894961), (-36.7634110153, -4.9380864948))
            Line((-36.7634110153, -4.9380864948), (-36.7634110153, -4.3185824581))
            add(Edge.make_bspline(
                [(-36.7634110153, -4.3185824581), (-37.4020860912, -4.207338462), (-38.1238877565, -4.207338462)],
                knots=[0.8848345835, 0.8848345835, 0.8848345835, 1, 1, 1], degree=2))
        make_face()
        with BuildLine():
            Line((-40.7634110153, -4.7359894961), (-40.7634110153, -4.6859490545))
            add(Edge.make_bspline(
                [(-40.7634110153, -4.6859490545), (-42.0248298439, -5.2133412831), (-42.8612204046, -6.3218793686)],
                knots=[0.475754722, 0.475754722, 0.475754722, 1, 1, 1], degree=2))
            add(Edge.make_bspline(
                [(-42.8612204046, -6.3218793686), (-44.4566388007, -8.4364202752), (-44.4566388007, -12.5948361969)],
                knots=[0, 0, 0, 1, 1, 1], degree=2))
            add(Edge.make_bspline(
                [(-44.4566388007, -12.5948361969), (-44.4566388007, -16.7586879565), (-42.877527918, -18.8650751064)],
                knots=[0, 0, 0, 1, 1, 1], degree=2))
            add(Edge.make_bspline(
                [(-42.877527918, -18.8650751064), (-41.9401032757, -20.115512452), (-40.4519320428, -20.6236391757)],
                knots=[0, 0, 0, 0.5936407966, 0.5936407966, 0.5936407966], degree=2))
            Line((-40.4519320428, -20.6236391757), (-40.4519320428, -18.9498923719))
            Line((-40.4519320428, -18.9498923719), (-36.4519320428, -18.9498923719))
            Line((-36.4519320428, -18.9498923719), (-36.4383714184, -20.7899860206))
            add(Edge.make_bspline(
                [(-36.4383714184, -20.7899860206), (-31.856366766, -19.7385151508), (-31.856366766, -12.5948361969)],
                knots=[0.1471889872, 0.1471889872, 0.1471889872, 1, 1, 1], degree=2))
            add(Edge.make_bspline(
                [(-31.856366766, -12.5948361969), (-31.856366766, -5.173288132), (-36.7634110153, -4.3185824581)],
                knots=[0, 0, 0, 0.8848345835, 0.8848345835, 0.8848345835], degree=2))
            Line((-36.7634110153, -4.3185824581), (-36.7634110153, -4.9380864948))
            Line((-36.7634110153, -4.9380864948), (-40.7634110153, -4.7359894961))
        make_face()
        with BuildLine():
            add(Edge.make_bspline(
                [(-38.1565027833, -25.3907983927), (-39.3634674537, -25.3907983927), (-40.4519320428, -25.2426429066)],
                knots=[0, 0, 0, 0.2114651326, 0.2114651326, 0.2114651326], degree=2))
            Line((-40.4519320428, -25.2426429066), (-40.4519320428, -25.9454939514))
            Line((-40.4519320428, -25.9454939514), (-36.4003777504, -25.9454939514))
            Line((-36.4003777504, -25.9454939514), (-36.405085353, -25.3067011213))
            add(Edge.make_bspline(
                [(-36.405085353, -25.3067011213), (-37.2471620585, -25.3907983927), (-38.1565027833, -25.3907983927)],
                knots=[0.8406797965, 0.8406797965, 0.8406797965, 1, 1, 1], degree=2))
        make_face()
        with BuildLine():
            Line((-40.4519320428, -25.0483406109), (-40.4519320428, -25.2426429066))
            add(Edge.make_bspline(
                [(-38.1565027833, -25.3907983927), (-39.3634674537, -25.3907983927), (-40.4519320428, -25.2426429066)],
                knots=[0, 0, 0, 0.2114651326, 0.2114651326, 0.2114651326], degree=2))
            add(Edge.make_bspline(
                [(-36.405085353, -25.3067011213), (-37.2471620585, -25.3907983927), (-38.1565027833, -25.3907983927)],
                knots=[0.8406797965, 0.8406797965, 0.8406797965, 1, 1, 1], degree=2))
            Line((-36.405085353, -25.3067011213), (-36.4383714184, -20.7899860206))
            add(Edge.make_bspline(
                [(-38.1565027833, -20.9714622563), (-37.2291921439, -20.9714622563), (-36.4383714184, -20.7899860206)],
                knots=[0, 0, 0, 0.1471889872, 0.1471889872, 0.1471889872], degree=2))
            add(Edge.make_bspline(
                [(-40.4519320428, -20.6236391757), (-39.4332485559, -20.9714622563), (-38.1565027833, -20.9714622563)],
                knots=[0.5936407966, 0.5936407966, 0.5936407966, 1, 1, 1], degree=2))
            Line((-40.4519320428, -20.6236391757), (-40.4519320428, -25.0483406109))
        make_face()
        with BuildLine():
            add(Edge.make_bspline(
                [(-38.1565027833, -20.9714622563), (-37.2291921439, -20.9714622563), (-36.4383714184, -20.7899860206)],
                knots=[0, 0, 0, 0.1471889872, 0.1471889872, 0.1471889872], degree=2))
            Line((-36.4383714184, -20.7899860206), (-36.4519320428, -18.9498923719))
            Line((-36.4519320428, -18.9498923719), (-40.4519320428, -18.9498923719))
            Line((-40.4519320428, -18.9498923719), (-40.4519320428, -20.6236391757))
            add(Edge.make_bspline(
                [(-40.4519320428, -20.6236391757), (-39.4332485559, -20.9714622563), (-38.1565027833, -20.9714622563)],
                knots=[0.5936407966, 0.5936407966, 0.5936407966, 1, 1, 1], degree=2))
        make_face()
    extrude(amount=-F1_DEPTH)

    # F0 (on Top) → F2 (join)
    with BuildSketch(Plane.XY):
        with Locations((2.2549219429, -12.638609002)):
            Rectangle(F0_W_3, F0_H_3)
        with Locations((2.6164503098, -12.6290581763)):
            Rectangle(F0_W, F0_H, mode=Mode.SUBTRACT)
    extrude(amount=-F2_DEPTH)


solid = f1.part
